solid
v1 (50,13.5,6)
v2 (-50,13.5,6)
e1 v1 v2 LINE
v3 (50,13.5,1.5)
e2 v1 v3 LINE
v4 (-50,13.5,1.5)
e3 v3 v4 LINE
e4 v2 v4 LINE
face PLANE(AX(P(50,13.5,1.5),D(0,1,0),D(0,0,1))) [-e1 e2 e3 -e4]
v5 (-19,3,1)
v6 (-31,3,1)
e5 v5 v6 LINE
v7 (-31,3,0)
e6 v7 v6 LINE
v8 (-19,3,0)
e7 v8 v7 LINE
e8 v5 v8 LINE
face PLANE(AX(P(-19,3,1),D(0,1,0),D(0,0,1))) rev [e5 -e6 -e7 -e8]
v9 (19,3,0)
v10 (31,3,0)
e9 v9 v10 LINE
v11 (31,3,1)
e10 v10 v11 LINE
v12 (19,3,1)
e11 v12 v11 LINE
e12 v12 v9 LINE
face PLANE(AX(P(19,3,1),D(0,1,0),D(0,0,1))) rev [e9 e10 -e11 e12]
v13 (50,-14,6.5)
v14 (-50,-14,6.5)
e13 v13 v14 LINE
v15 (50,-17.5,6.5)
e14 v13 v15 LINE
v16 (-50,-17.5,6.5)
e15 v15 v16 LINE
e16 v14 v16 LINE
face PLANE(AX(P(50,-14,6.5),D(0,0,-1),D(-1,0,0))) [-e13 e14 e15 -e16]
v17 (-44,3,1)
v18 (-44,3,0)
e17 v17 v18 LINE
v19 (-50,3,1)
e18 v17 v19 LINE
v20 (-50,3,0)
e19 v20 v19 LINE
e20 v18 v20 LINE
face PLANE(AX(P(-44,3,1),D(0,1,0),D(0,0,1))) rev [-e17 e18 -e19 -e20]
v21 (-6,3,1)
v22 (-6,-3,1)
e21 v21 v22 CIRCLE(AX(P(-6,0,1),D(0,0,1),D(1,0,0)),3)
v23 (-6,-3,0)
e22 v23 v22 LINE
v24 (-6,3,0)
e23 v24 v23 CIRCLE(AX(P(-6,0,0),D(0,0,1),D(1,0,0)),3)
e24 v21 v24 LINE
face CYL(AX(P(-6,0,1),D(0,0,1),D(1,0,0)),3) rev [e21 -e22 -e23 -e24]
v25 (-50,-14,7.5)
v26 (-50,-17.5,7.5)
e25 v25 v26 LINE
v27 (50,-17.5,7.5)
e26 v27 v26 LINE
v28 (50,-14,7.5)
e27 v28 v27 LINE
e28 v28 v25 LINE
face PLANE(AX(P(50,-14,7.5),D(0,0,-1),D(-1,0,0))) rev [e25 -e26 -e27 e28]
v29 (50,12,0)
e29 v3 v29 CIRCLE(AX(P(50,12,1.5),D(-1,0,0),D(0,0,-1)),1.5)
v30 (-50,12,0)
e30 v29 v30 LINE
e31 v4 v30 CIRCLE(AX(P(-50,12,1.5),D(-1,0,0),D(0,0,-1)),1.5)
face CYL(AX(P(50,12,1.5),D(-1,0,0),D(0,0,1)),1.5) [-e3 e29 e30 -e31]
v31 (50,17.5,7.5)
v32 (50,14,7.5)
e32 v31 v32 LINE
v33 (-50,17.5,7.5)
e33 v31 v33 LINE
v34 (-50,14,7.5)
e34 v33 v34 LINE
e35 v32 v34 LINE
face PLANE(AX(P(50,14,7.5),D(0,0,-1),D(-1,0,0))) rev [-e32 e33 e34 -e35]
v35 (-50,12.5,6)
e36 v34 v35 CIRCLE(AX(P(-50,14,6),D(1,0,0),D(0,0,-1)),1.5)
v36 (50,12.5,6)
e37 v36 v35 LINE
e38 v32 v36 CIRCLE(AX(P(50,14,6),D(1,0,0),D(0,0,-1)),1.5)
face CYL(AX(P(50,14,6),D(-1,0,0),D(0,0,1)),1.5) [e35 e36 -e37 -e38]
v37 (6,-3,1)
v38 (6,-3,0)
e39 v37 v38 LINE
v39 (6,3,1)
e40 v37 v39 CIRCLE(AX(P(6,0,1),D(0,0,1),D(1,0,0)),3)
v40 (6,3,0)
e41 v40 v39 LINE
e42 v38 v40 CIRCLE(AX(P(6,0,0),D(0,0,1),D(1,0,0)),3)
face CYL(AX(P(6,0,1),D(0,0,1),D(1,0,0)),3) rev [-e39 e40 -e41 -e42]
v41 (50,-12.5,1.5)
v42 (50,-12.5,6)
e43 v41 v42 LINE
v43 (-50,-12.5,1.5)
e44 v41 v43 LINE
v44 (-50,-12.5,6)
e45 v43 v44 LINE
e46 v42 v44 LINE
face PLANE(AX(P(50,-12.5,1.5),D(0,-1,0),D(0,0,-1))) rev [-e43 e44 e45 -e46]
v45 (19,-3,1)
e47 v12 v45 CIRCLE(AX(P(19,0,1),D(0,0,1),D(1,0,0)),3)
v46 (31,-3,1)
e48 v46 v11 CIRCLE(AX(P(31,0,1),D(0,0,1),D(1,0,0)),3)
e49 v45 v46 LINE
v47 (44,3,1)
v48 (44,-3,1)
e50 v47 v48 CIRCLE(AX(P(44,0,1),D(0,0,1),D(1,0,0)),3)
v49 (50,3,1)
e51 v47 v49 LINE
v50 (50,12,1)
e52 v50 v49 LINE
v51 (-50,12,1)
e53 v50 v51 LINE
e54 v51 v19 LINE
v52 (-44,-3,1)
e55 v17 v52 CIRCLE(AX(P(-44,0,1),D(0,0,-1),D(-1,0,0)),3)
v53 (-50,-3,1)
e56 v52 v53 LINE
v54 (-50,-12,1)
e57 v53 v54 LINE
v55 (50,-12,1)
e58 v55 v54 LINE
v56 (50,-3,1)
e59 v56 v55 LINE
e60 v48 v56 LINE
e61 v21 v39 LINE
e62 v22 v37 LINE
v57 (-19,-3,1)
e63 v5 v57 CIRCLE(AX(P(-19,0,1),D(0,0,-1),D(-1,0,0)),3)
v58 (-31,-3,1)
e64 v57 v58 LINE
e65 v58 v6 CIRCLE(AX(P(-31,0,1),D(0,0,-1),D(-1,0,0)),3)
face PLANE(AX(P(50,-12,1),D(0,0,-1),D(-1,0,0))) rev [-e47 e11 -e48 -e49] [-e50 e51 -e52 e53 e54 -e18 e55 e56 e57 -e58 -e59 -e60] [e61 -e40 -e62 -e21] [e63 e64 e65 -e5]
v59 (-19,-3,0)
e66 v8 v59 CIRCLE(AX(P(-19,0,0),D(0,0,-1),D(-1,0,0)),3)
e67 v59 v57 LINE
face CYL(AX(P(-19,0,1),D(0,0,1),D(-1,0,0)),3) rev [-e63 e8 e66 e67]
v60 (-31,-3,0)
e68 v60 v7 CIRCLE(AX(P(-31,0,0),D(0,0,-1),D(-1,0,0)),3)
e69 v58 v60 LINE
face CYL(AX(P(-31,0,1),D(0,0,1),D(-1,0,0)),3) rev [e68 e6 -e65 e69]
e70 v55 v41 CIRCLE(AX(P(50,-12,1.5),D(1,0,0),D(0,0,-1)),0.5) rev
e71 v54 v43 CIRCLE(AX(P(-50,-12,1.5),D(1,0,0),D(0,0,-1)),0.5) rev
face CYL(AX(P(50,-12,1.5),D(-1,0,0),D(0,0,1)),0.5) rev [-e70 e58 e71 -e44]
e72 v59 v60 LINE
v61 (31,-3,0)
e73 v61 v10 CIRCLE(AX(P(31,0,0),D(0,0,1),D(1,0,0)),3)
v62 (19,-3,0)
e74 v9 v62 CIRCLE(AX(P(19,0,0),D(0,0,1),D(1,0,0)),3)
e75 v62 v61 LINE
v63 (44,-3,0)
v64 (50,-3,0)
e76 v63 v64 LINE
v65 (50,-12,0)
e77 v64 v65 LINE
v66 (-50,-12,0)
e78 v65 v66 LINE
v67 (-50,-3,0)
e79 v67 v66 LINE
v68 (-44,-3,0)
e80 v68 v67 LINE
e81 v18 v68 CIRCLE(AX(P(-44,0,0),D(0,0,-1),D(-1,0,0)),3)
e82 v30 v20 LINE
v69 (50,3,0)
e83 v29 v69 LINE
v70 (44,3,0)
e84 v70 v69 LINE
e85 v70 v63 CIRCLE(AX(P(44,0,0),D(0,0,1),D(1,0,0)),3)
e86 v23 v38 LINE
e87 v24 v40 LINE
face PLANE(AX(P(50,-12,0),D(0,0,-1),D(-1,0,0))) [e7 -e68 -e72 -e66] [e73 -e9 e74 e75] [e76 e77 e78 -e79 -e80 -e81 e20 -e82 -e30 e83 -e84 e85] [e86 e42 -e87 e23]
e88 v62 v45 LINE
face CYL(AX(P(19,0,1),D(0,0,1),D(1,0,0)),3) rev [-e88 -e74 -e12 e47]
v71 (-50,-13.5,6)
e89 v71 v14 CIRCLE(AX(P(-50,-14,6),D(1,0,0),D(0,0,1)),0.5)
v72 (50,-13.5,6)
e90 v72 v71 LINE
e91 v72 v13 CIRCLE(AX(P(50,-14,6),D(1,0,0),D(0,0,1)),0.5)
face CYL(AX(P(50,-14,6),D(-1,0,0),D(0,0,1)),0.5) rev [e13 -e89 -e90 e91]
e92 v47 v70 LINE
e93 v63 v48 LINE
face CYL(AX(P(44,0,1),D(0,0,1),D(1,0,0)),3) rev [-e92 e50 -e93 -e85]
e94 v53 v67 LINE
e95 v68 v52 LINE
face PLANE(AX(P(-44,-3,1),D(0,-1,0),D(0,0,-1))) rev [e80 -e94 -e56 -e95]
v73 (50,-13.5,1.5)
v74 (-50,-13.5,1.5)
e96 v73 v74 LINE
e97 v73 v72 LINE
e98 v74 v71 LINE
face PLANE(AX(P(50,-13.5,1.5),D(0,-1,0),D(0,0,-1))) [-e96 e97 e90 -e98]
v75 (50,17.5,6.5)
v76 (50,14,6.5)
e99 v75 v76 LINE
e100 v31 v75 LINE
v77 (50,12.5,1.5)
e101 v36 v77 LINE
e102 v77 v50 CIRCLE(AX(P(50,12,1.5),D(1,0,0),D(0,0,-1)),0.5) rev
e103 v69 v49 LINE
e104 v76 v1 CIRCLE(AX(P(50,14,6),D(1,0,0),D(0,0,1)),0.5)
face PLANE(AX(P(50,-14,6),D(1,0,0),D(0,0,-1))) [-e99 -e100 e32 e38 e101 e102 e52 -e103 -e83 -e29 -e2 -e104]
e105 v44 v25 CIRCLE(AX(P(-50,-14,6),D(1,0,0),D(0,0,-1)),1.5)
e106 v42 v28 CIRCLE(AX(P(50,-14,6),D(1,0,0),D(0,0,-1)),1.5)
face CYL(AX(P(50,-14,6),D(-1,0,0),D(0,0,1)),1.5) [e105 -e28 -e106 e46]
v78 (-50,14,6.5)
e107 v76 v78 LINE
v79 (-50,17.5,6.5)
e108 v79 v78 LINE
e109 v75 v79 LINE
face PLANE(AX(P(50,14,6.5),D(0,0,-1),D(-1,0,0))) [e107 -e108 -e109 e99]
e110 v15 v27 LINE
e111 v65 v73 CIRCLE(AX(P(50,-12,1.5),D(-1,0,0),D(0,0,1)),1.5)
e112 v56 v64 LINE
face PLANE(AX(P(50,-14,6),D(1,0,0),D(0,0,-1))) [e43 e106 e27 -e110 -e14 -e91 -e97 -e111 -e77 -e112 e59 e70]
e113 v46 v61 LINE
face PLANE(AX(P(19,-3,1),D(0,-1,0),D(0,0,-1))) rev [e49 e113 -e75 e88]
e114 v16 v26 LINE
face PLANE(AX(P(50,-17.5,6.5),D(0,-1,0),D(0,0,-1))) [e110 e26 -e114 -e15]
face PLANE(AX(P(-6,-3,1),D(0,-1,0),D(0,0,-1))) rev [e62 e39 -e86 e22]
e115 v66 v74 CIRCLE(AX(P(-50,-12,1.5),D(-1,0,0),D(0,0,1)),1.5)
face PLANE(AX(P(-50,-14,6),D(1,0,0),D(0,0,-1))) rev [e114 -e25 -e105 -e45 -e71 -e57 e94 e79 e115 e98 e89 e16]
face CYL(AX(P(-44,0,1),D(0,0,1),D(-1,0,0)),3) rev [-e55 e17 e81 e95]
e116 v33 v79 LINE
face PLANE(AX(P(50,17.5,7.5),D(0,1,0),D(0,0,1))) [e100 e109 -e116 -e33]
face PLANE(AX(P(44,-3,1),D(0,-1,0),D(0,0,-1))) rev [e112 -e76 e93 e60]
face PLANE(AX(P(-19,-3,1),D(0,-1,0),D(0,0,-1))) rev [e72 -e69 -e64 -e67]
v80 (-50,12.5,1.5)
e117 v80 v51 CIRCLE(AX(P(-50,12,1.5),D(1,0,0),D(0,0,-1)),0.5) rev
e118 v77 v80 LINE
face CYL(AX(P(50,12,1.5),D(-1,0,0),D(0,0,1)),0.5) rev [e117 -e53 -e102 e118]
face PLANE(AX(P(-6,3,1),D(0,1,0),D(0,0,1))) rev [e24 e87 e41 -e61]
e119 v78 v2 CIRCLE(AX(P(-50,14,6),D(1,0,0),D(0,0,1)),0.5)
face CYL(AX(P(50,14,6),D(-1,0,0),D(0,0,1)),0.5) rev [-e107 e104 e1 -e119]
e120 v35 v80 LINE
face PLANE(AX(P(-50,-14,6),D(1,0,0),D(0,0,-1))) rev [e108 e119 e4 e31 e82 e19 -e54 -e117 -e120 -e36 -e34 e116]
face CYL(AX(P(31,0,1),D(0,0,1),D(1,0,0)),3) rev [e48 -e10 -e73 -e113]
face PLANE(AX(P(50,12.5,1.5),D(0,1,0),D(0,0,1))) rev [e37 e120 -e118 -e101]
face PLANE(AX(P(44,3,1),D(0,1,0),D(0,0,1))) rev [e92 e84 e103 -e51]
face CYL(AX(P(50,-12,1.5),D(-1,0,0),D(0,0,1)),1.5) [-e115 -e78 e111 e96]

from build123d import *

# Parameters (mm, degrees)
EXTRUDE_1_DEPTH           = 50
HOLE_WIZARD_6_0_6_1_DEPTH = 1
PATTERN_LINEAR_1_COUNT    = 3
PATTERN_LINEAR_1_PITCH    = 25
MIRROR_1_COPY_1_DEPTH     = 1
MIRROR_1_COPY_2_DEPTH     = 1
MIRROR_1_COPY_3_DEPTH     = 1


# Read off the part's stored shape, not the designer's step: Диаметр отверстия Ø6.0 (6)1
with BuildPart() as part:
    # Эскиз1 → Вытянуть-Тонкостенный1 (new, symmetric)
    with BuildSketch(Plane(origin=(0, 0, 0), x_dir=(0, 0, -1), z_dir=(1, 0, 0))):
        with BuildLine():
            Line((-6.5, -17.5), (-6.5, -14))
            ThreePointArc((-6.5, -14), (-6.353553391, -13.646446609), (-6, -13.5))
            Line((-6, -13.5), (-1.5, -13.5))
            ThreePointArc((-1.5, -13.5), (-0.439339828, -13.060660172), (0, -12))
            Line((0, -12), (0, 12))
            ThreePointArc((0, 12), (-0.439339828, 13.060660172), (-1.5, 13.5))
            Line((-1.5, 13.5), (-6, 13.5))
            ThreePointArc((-6, 13.5), (-6.353553391, 13.646446609), (-6.5, 14))
            Line((-6.5, 14), (-6.5, 17.5))
            Line((-6.5, 17.5), (-7.5, 17.5))
            Line((-7.5, 17.5), (-7.5, 14))
            ThreePointArc((-7.5, 14), (-7.060660172, 12.939339828), (-6, 12.5))
            Line((-6, 12.5), (-1.5, 12.5))
            ThreePointArc((-1.5, 12.5), (-1.146446609, 12.353553391), (-1, 12))
            Line((-1, 12), (-1, -12))
            ThreePointArc((-1, -12), (-1.146446609, -12.353553391), (-1.5, -12.5))
            Line((-1.5, -12.5), (-6, -12.5))
            ThreePointArc((-6, -12.5), (-7.060660172, -12.939339828), (-7.5, -14))
            Line((-7.5, -14), (-7.5, -17.5))
            Line((-7.5, -17.5), (-6.5, -17.5))
        make_face()
    extrude(amount=EXTRUDE_1_DEPTH, both=True)

    # Диаметр отверстия Ø6.0 (6)1 outline → Диаметр отверстия Ø6.0 (6)1 (cut)
    with BuildSketch(Plane.XY):
        with BuildLine():
            Line((-6, -3), (6, -3))
            ThreePointArc((6, -3), (9, 0), (6, 3))
            Line((6, 3), (-6, 3))
            ThreePointArc((-6, 3), (-9, 0), (-6, -3))
        make_face()
    hole_wizard_6_0_6_1 = extrude(amount=HOLE_WIZARD_6_0_6_1_DEPTH, mode=Mode.SUBTRACT)

    # Линейный массив1: Диаметр отверстия Ø6.0 (6)1 ×3
    with Locations(*[(i * PATTERN_LINEAR_1_PITCH, 0, 0) for i in range(1, PATTERN_LINEAR_1_COUNT)]):
        add(hole_wizard_6_0_6_1, mode=Mode.SUBTRACT)

    # Зеркальное отражение1 copy 1 sketch → Зеркальное отражение1 copy 1 (cut)
    with BuildSketch(Plane(origin=(-25, 0, 0), x_dir=(-1, 0, 0), z_dir=(0, 0, 1))):
        with BuildLine():
            Line((-6, 3), (6, 3))
            ThreePointArc((6, 3), (9, 0), (6, -3))
            Line((6, -3), (-6, -3))
            ThreePointArc((-6, -3), (-9, 0), (-6, 3))
        make_face()
    extrude(amount=MIRROR_1_COPY_1_DEPTH, mode=Mode.SUBTRACT)

    # Зеркальное отражение1 copy 2 sketch → Зеркальное отражение1 copy 2 (cut)
    with BuildSketch(Plane(origin=(-50, 0, 0), x_dir=(-1, 0, 0), z_dir=(0, 0, 1))):
        with BuildLine():
            Line((-6, 3), (6, 3))
            ThreePointArc((6, 3), (9, 0), (6, -3))
            Line((6, -3), (-6, -3))
            ThreePointArc((-6, -3), (-9, 0), (-6, 3))
        make_face()
    extrude(amount=MIRROR_1_COPY_2_DEPTH, mode=Mode.SUBTRACT)

    # Зеркальное отражение1 copy 3 sketch → Зеркальное отражение1 copy 3 (cut)
    with BuildSketch(Plane(origin=(0, 0, 0), x_dir=(-1, 0, 0), z_dir=(0, 0, 1))):
        with BuildLine():
            Line((-6, 3), (6, 3))
            ThreePointArc((6, 3), (9, 0), (6, -3))
            Line((6, -3), (-6, -3))
            ThreePointArc((-6, -3), (-9, 0), (-6, 3))
        make_face()
    extrude(amount=MIRROR_1_COPY_3_DEPTH, mode=Mode.SUBTRACT)


solid = part.part
